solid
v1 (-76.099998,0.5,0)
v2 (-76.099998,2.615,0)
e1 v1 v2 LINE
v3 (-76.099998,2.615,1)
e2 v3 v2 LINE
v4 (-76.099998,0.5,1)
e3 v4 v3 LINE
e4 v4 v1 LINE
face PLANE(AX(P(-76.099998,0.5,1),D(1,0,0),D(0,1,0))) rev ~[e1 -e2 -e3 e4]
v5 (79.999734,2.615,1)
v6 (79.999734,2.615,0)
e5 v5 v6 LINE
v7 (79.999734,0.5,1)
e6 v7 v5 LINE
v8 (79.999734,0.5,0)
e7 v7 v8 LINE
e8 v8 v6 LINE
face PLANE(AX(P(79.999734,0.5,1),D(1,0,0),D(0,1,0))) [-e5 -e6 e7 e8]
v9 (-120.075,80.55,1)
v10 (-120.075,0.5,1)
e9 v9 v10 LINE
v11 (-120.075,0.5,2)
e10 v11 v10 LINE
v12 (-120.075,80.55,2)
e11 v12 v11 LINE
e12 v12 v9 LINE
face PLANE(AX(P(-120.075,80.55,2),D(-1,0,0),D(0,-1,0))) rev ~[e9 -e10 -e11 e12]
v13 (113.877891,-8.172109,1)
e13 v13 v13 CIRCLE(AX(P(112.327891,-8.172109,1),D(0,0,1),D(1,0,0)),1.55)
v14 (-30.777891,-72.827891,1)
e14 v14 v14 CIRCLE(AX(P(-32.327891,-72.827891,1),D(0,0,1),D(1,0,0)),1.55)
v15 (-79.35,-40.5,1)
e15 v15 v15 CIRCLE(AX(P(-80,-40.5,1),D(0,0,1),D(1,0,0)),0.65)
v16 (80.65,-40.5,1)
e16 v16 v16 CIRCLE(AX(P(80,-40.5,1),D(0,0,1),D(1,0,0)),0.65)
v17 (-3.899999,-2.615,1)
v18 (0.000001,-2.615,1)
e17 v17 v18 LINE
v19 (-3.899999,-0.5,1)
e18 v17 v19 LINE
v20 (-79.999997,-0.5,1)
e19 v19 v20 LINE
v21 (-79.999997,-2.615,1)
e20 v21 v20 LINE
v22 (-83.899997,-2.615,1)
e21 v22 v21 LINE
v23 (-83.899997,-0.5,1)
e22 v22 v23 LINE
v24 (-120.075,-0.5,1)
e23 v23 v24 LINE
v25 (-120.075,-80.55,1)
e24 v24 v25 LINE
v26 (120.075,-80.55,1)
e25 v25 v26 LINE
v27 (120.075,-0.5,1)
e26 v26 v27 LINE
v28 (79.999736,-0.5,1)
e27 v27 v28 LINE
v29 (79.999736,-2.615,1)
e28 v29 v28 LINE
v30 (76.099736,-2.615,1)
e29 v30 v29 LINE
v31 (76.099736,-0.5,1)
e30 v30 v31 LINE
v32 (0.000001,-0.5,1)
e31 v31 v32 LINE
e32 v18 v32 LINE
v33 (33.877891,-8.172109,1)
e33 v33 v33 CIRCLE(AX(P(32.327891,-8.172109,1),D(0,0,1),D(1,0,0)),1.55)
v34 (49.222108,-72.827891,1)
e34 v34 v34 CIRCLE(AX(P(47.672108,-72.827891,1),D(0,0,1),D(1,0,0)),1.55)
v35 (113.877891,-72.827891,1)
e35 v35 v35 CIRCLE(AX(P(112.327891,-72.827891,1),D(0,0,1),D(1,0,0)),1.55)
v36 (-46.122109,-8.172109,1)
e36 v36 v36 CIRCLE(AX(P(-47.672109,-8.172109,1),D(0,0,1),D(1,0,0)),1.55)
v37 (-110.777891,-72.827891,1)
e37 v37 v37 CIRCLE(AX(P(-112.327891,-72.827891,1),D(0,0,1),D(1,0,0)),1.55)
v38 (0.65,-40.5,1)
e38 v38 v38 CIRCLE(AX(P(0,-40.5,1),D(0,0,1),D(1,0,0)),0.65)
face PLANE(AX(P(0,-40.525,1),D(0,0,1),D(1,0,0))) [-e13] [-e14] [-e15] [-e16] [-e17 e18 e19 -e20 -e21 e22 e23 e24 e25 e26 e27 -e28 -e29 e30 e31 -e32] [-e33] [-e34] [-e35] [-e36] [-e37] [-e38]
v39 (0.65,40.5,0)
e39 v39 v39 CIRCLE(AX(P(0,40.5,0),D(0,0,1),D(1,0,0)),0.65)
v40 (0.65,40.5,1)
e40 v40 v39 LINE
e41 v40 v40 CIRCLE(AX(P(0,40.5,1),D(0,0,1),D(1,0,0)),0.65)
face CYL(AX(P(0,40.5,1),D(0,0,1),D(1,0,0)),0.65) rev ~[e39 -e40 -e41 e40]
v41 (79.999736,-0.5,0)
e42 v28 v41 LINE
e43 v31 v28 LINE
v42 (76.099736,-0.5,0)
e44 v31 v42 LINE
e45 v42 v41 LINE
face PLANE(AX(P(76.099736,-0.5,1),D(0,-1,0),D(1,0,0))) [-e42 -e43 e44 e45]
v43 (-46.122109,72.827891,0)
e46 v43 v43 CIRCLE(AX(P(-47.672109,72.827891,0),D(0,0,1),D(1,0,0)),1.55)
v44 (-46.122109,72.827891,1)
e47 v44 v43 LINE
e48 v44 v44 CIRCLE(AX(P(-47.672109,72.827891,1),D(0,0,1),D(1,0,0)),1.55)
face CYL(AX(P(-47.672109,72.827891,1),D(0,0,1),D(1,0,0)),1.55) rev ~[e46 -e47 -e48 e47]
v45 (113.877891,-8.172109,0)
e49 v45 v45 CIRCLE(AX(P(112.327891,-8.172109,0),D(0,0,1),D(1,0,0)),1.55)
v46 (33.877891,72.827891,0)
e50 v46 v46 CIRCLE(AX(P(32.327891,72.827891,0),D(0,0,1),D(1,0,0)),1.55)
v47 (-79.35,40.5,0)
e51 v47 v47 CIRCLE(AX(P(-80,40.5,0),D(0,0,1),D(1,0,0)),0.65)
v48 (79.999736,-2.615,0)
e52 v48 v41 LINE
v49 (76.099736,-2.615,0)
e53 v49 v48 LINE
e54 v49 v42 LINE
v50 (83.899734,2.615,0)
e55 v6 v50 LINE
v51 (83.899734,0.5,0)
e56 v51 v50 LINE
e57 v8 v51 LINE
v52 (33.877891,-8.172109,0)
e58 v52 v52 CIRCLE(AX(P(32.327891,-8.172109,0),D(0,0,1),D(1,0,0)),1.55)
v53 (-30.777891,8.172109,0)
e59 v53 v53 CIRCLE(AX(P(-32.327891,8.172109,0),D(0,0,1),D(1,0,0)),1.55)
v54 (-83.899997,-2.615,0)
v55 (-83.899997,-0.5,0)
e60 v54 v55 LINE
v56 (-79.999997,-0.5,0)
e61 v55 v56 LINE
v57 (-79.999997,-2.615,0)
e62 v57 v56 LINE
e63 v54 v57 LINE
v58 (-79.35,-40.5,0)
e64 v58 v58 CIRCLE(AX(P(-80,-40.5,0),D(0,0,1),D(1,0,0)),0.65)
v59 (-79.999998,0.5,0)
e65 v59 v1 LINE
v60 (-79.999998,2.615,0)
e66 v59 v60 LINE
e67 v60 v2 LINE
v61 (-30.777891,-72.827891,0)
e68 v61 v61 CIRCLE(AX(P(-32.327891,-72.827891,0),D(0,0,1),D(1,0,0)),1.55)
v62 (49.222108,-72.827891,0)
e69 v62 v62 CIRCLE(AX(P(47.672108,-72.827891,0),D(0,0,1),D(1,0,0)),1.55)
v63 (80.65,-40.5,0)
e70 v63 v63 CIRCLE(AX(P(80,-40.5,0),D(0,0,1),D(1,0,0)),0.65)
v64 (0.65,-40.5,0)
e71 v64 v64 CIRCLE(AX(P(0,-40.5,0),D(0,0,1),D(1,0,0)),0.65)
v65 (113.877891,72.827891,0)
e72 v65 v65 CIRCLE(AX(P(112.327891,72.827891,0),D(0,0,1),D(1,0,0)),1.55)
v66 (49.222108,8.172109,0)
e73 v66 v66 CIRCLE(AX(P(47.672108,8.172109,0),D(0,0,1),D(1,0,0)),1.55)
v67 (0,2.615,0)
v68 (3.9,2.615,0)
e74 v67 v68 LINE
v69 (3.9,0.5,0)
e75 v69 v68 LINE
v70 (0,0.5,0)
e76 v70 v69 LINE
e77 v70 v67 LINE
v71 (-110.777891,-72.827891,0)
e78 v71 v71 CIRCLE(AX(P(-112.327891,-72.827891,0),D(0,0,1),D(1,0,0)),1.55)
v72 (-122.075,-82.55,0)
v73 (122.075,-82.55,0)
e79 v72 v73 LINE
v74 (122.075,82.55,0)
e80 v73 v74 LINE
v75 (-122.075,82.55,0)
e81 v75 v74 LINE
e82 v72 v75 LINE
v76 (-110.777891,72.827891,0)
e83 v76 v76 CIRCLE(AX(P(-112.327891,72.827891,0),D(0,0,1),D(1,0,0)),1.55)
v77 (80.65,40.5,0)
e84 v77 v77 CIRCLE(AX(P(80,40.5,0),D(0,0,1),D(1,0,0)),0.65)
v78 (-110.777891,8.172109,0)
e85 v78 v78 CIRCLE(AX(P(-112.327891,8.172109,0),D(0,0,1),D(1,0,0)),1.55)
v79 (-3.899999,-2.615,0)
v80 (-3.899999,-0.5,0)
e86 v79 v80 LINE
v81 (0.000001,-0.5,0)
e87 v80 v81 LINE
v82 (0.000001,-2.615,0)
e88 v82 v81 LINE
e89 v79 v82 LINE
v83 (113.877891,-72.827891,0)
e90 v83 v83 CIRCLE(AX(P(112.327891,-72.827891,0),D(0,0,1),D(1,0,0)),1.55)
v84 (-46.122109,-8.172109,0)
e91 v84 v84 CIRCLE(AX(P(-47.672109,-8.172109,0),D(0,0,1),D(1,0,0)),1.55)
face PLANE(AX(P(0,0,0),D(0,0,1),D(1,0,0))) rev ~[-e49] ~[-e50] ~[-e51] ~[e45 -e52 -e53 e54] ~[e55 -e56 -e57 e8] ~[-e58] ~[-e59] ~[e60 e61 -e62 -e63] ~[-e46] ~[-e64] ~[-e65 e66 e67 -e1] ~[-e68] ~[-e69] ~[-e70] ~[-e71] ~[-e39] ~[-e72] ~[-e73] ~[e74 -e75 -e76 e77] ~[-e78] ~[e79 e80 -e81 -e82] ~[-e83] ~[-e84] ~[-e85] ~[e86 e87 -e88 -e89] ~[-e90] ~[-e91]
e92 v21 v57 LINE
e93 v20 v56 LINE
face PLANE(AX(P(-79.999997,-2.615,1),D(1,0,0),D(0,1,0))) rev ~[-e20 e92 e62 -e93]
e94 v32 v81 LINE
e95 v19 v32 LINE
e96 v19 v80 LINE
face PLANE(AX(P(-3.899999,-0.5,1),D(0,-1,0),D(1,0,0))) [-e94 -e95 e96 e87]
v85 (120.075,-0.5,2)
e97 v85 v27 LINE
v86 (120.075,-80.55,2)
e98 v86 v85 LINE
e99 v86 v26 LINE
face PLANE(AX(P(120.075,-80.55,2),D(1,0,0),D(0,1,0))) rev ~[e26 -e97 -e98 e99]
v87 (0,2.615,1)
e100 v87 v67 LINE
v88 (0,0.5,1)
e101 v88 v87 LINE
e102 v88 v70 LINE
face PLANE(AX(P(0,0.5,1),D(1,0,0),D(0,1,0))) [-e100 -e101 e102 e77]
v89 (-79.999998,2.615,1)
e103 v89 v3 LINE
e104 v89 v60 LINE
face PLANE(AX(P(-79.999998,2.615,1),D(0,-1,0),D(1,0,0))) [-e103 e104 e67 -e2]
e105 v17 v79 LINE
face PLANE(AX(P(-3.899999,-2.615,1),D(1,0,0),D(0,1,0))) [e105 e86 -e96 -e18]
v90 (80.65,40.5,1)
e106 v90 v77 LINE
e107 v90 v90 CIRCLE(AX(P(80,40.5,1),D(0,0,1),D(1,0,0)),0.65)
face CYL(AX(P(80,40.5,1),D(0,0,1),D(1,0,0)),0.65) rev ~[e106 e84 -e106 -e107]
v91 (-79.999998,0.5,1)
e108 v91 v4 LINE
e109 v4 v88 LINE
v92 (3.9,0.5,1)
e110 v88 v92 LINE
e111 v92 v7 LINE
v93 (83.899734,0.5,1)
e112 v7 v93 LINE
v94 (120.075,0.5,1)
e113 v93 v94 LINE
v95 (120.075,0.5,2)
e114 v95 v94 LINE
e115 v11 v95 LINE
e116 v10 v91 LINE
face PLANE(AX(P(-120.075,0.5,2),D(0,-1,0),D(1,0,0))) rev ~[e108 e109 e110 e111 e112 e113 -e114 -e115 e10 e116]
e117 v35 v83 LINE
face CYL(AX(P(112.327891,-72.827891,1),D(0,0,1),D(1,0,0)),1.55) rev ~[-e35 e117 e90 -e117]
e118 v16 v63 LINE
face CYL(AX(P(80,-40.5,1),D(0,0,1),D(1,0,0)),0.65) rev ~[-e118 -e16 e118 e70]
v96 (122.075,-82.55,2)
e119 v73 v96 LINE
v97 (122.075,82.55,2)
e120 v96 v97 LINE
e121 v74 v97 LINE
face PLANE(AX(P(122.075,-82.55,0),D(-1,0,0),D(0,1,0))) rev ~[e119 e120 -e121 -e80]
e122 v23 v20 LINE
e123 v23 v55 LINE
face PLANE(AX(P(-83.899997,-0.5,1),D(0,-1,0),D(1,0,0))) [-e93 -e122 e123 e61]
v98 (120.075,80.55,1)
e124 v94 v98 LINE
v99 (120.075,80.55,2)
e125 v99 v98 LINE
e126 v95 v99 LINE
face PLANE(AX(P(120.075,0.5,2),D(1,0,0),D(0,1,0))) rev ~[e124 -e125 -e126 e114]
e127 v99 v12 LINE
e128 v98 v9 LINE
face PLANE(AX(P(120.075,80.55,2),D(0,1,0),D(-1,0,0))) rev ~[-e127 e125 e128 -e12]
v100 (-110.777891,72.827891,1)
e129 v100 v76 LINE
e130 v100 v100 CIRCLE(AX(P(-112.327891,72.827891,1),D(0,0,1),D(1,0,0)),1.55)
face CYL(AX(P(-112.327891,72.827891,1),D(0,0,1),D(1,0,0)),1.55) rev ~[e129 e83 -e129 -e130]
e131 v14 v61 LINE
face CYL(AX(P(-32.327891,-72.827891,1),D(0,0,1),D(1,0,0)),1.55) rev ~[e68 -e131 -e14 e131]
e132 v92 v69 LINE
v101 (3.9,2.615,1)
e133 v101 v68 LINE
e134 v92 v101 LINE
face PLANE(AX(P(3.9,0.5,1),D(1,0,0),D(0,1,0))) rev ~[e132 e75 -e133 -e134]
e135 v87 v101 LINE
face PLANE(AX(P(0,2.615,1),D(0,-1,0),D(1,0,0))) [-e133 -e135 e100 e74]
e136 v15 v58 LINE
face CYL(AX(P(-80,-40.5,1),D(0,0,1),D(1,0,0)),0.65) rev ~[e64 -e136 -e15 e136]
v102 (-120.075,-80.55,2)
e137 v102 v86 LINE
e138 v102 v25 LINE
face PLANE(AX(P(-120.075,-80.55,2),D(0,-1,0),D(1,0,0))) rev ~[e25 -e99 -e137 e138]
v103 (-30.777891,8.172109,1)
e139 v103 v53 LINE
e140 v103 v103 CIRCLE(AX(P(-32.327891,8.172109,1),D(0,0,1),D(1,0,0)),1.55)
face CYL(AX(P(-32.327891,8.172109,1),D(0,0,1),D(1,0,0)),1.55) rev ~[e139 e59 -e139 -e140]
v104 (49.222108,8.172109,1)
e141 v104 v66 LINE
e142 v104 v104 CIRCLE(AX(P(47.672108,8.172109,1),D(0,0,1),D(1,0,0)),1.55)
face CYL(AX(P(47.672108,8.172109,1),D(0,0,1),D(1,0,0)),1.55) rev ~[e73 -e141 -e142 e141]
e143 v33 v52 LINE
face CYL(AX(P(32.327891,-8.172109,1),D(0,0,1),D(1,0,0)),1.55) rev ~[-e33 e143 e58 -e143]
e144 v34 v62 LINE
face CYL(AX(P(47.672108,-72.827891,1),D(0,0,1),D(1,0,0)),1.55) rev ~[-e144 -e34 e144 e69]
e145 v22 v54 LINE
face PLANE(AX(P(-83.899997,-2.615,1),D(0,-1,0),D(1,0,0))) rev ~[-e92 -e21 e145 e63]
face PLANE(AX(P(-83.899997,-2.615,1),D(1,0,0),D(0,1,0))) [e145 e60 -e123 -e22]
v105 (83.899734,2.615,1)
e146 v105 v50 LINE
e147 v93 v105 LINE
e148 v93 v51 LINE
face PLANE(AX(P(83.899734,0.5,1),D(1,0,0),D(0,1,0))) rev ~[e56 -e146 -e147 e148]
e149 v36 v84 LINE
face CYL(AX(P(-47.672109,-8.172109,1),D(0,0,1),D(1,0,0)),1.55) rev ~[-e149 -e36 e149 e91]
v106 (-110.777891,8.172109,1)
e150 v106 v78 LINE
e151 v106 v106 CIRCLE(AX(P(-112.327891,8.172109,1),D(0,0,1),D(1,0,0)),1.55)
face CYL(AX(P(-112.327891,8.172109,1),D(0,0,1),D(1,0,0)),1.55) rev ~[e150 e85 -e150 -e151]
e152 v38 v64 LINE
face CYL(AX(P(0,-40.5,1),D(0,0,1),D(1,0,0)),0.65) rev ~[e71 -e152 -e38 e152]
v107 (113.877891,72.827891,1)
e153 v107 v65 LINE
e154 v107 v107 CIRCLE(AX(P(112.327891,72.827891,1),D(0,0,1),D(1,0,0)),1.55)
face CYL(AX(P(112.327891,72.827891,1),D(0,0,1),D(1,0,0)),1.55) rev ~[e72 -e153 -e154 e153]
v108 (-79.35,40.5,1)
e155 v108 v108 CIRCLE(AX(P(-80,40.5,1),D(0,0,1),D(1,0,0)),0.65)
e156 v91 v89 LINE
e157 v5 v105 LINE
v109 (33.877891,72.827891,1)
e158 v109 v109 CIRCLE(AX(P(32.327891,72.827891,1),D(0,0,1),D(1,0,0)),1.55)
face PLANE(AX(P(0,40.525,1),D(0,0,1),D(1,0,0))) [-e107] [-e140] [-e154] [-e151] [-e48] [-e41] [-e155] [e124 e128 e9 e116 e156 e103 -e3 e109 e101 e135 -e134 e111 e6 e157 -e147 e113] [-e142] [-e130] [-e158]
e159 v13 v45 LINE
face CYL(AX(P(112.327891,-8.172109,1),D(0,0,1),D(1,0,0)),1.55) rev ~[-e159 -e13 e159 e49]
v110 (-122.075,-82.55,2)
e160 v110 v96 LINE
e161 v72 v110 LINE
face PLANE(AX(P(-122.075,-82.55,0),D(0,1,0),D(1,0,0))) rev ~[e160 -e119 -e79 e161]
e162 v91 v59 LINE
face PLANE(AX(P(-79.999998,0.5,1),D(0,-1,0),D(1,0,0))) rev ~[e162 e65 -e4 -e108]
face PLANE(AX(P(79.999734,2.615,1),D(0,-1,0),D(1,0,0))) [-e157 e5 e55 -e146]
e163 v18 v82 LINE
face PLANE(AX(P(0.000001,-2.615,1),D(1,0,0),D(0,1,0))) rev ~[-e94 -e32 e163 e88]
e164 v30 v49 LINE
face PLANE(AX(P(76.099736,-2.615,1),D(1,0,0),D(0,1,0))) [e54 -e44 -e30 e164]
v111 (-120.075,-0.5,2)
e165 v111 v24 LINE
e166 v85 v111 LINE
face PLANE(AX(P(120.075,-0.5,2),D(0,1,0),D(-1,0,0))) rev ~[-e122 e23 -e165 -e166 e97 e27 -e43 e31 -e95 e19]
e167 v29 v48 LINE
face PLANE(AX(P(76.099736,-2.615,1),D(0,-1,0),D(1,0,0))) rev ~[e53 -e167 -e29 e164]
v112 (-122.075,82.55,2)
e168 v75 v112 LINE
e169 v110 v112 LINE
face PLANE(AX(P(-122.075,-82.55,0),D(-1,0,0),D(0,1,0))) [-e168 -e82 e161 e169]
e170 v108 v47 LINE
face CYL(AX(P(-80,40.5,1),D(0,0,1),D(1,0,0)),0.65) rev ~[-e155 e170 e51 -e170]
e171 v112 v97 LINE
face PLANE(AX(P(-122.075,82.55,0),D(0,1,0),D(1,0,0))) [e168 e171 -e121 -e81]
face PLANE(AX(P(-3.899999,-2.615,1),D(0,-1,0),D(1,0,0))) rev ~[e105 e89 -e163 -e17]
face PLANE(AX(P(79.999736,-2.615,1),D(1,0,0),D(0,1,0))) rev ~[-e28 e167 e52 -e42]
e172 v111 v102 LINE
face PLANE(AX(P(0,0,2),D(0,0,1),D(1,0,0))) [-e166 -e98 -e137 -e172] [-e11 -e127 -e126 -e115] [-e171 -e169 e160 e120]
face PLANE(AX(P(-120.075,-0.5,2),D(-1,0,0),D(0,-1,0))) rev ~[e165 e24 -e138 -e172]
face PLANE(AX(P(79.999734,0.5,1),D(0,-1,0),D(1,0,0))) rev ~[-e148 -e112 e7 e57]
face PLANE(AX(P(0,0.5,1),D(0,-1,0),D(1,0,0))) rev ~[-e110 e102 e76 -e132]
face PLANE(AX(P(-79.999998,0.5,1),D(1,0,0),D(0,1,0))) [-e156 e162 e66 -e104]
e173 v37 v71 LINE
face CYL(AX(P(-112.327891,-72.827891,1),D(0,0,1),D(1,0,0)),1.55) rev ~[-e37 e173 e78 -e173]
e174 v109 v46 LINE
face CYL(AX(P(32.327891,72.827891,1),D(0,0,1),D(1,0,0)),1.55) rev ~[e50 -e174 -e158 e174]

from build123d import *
from build123d import SkipClean  # not in build123d's __all__

# Parameters (mm, degrees)
F0_W     = 244.15
F0_H     = 165.1
F1_DEPTH = 2
F3_DEPTH = 1
F4_R     = 1.55
F4_R_2   = 0.65
F4_W     = 3.9
F4_H     = 2.115
F5_DEPTH = 1.001


with BuildPart() as f1:
    # F0 (on Top) → F1 (new body)
    with BuildSketch(Plane.XY):
        Rectangle(F0_W, F0_H)
    extrude(amount=F1_DEPTH)

    # F2 (on face) → F3 (cut)
    with BuildSketch(Plane.XY.offset(2)):
        Polygon((120.075, 80.55), (-120.075, 80.55), (-120.075, 1), (-120.075, 0.5), (120.075, 0.5), (120.075, 1), align=None)
        Polygon((-120.075, -80.55), (120.075, -80.55), (120.075, -1), (120.075, -0.5), (-120.075, -0.5), (-120.075, -1), align=None)
    extrude(amount=-F3_DEPTH, mode=Mode.SUBTRACT)

    # F4 (on face) → F5 (cut, through all)
    with BuildSketch(Plane.XY.offset(1)):
        with Locations((-47.6721085759, 72.8278914241)):
            Circle(F4_R)
        with Locations((32.3278905301, 72.8278914241)):
            Circle(F4_R)
        with Locations((112.3278914241, 72.8278914241)):
            Circle(F4_R)
        with Locations((-112.3278914241, 8.1721085759)):
            Circle(F4_R)
        with Locations((-32.3278914241, 8.1721085759)):
            Circle(F4_R)
        with Locations((47.6721076818, 8.1721085759)):
            Circle(F4_R)
        with Locations((-80, 40.5)):
            Circle(F4_R_2)
        with Locations((-4.47e-07, 40.5)):
            Circle(F4_R_2)
        with Locations((79.999999553, 40.5)):
            Circle(F4_R_2)
        with Locations((-112.3278914241, -72.8278914241)):
            Circle(F4_R)
        with Locations((-32.3278914241, -72.8278914241)):
            Circle(F4_R)
        with Locations((47.6721076818, -72.8278914241)):
            Circle(F4_R)
        with Locations((112.3278914241, -8.1721085759)):
            Circle(F4_R)
        with Locations((32.3278905301, -8.1721085759)):
            Circle(F4_R)
        with Locations((-47.6721085759, -8.1721085759)):
            Circle(F4_R)
        with Locations((-4.47e-07, -40.5)):
            Circle(F4_R_2)
        with Locations((79.999999553, -40.5)):
            Circle(F4_R_2)
        with Locations((112.3278914241, -72.8278914241)):
            Circle(F4_R)
        with Locations((-112.3278914241, 72.8278914241)):
            Circle(F4_R)
        with Locations((-80, -40.5)):
            Circle(F4_R_2)
        with Locations((-81.949996841, -1.5575)):
            Rectangle(F4_W, F4_H)
        with Locations((-78.0499982119, 1.5575)):
            Rectangle(F4_W, F4_H)
        with Locations((-1.9499991059, -1.5575001072)):
            Rectangle(F4_W, F4_H)
        with Locations((1.9499995232, 1.5575)):
            Rectangle(F4_W, F4_H)
        with Locations((78.0497357585, -1.5575)):
            Rectangle(F4_W, F4_H)
        with Locations((81.9497343876, 1.5575)):
            Rectangle(F4_W, F4_H)
    with SkipClean():  # cleaning this boolean's faces spoils the solid; the shape is the same uncleaned
        extrude(amount=-F5_DEPTH, mode=Mode.SUBTRACT)


solid = f1.part
